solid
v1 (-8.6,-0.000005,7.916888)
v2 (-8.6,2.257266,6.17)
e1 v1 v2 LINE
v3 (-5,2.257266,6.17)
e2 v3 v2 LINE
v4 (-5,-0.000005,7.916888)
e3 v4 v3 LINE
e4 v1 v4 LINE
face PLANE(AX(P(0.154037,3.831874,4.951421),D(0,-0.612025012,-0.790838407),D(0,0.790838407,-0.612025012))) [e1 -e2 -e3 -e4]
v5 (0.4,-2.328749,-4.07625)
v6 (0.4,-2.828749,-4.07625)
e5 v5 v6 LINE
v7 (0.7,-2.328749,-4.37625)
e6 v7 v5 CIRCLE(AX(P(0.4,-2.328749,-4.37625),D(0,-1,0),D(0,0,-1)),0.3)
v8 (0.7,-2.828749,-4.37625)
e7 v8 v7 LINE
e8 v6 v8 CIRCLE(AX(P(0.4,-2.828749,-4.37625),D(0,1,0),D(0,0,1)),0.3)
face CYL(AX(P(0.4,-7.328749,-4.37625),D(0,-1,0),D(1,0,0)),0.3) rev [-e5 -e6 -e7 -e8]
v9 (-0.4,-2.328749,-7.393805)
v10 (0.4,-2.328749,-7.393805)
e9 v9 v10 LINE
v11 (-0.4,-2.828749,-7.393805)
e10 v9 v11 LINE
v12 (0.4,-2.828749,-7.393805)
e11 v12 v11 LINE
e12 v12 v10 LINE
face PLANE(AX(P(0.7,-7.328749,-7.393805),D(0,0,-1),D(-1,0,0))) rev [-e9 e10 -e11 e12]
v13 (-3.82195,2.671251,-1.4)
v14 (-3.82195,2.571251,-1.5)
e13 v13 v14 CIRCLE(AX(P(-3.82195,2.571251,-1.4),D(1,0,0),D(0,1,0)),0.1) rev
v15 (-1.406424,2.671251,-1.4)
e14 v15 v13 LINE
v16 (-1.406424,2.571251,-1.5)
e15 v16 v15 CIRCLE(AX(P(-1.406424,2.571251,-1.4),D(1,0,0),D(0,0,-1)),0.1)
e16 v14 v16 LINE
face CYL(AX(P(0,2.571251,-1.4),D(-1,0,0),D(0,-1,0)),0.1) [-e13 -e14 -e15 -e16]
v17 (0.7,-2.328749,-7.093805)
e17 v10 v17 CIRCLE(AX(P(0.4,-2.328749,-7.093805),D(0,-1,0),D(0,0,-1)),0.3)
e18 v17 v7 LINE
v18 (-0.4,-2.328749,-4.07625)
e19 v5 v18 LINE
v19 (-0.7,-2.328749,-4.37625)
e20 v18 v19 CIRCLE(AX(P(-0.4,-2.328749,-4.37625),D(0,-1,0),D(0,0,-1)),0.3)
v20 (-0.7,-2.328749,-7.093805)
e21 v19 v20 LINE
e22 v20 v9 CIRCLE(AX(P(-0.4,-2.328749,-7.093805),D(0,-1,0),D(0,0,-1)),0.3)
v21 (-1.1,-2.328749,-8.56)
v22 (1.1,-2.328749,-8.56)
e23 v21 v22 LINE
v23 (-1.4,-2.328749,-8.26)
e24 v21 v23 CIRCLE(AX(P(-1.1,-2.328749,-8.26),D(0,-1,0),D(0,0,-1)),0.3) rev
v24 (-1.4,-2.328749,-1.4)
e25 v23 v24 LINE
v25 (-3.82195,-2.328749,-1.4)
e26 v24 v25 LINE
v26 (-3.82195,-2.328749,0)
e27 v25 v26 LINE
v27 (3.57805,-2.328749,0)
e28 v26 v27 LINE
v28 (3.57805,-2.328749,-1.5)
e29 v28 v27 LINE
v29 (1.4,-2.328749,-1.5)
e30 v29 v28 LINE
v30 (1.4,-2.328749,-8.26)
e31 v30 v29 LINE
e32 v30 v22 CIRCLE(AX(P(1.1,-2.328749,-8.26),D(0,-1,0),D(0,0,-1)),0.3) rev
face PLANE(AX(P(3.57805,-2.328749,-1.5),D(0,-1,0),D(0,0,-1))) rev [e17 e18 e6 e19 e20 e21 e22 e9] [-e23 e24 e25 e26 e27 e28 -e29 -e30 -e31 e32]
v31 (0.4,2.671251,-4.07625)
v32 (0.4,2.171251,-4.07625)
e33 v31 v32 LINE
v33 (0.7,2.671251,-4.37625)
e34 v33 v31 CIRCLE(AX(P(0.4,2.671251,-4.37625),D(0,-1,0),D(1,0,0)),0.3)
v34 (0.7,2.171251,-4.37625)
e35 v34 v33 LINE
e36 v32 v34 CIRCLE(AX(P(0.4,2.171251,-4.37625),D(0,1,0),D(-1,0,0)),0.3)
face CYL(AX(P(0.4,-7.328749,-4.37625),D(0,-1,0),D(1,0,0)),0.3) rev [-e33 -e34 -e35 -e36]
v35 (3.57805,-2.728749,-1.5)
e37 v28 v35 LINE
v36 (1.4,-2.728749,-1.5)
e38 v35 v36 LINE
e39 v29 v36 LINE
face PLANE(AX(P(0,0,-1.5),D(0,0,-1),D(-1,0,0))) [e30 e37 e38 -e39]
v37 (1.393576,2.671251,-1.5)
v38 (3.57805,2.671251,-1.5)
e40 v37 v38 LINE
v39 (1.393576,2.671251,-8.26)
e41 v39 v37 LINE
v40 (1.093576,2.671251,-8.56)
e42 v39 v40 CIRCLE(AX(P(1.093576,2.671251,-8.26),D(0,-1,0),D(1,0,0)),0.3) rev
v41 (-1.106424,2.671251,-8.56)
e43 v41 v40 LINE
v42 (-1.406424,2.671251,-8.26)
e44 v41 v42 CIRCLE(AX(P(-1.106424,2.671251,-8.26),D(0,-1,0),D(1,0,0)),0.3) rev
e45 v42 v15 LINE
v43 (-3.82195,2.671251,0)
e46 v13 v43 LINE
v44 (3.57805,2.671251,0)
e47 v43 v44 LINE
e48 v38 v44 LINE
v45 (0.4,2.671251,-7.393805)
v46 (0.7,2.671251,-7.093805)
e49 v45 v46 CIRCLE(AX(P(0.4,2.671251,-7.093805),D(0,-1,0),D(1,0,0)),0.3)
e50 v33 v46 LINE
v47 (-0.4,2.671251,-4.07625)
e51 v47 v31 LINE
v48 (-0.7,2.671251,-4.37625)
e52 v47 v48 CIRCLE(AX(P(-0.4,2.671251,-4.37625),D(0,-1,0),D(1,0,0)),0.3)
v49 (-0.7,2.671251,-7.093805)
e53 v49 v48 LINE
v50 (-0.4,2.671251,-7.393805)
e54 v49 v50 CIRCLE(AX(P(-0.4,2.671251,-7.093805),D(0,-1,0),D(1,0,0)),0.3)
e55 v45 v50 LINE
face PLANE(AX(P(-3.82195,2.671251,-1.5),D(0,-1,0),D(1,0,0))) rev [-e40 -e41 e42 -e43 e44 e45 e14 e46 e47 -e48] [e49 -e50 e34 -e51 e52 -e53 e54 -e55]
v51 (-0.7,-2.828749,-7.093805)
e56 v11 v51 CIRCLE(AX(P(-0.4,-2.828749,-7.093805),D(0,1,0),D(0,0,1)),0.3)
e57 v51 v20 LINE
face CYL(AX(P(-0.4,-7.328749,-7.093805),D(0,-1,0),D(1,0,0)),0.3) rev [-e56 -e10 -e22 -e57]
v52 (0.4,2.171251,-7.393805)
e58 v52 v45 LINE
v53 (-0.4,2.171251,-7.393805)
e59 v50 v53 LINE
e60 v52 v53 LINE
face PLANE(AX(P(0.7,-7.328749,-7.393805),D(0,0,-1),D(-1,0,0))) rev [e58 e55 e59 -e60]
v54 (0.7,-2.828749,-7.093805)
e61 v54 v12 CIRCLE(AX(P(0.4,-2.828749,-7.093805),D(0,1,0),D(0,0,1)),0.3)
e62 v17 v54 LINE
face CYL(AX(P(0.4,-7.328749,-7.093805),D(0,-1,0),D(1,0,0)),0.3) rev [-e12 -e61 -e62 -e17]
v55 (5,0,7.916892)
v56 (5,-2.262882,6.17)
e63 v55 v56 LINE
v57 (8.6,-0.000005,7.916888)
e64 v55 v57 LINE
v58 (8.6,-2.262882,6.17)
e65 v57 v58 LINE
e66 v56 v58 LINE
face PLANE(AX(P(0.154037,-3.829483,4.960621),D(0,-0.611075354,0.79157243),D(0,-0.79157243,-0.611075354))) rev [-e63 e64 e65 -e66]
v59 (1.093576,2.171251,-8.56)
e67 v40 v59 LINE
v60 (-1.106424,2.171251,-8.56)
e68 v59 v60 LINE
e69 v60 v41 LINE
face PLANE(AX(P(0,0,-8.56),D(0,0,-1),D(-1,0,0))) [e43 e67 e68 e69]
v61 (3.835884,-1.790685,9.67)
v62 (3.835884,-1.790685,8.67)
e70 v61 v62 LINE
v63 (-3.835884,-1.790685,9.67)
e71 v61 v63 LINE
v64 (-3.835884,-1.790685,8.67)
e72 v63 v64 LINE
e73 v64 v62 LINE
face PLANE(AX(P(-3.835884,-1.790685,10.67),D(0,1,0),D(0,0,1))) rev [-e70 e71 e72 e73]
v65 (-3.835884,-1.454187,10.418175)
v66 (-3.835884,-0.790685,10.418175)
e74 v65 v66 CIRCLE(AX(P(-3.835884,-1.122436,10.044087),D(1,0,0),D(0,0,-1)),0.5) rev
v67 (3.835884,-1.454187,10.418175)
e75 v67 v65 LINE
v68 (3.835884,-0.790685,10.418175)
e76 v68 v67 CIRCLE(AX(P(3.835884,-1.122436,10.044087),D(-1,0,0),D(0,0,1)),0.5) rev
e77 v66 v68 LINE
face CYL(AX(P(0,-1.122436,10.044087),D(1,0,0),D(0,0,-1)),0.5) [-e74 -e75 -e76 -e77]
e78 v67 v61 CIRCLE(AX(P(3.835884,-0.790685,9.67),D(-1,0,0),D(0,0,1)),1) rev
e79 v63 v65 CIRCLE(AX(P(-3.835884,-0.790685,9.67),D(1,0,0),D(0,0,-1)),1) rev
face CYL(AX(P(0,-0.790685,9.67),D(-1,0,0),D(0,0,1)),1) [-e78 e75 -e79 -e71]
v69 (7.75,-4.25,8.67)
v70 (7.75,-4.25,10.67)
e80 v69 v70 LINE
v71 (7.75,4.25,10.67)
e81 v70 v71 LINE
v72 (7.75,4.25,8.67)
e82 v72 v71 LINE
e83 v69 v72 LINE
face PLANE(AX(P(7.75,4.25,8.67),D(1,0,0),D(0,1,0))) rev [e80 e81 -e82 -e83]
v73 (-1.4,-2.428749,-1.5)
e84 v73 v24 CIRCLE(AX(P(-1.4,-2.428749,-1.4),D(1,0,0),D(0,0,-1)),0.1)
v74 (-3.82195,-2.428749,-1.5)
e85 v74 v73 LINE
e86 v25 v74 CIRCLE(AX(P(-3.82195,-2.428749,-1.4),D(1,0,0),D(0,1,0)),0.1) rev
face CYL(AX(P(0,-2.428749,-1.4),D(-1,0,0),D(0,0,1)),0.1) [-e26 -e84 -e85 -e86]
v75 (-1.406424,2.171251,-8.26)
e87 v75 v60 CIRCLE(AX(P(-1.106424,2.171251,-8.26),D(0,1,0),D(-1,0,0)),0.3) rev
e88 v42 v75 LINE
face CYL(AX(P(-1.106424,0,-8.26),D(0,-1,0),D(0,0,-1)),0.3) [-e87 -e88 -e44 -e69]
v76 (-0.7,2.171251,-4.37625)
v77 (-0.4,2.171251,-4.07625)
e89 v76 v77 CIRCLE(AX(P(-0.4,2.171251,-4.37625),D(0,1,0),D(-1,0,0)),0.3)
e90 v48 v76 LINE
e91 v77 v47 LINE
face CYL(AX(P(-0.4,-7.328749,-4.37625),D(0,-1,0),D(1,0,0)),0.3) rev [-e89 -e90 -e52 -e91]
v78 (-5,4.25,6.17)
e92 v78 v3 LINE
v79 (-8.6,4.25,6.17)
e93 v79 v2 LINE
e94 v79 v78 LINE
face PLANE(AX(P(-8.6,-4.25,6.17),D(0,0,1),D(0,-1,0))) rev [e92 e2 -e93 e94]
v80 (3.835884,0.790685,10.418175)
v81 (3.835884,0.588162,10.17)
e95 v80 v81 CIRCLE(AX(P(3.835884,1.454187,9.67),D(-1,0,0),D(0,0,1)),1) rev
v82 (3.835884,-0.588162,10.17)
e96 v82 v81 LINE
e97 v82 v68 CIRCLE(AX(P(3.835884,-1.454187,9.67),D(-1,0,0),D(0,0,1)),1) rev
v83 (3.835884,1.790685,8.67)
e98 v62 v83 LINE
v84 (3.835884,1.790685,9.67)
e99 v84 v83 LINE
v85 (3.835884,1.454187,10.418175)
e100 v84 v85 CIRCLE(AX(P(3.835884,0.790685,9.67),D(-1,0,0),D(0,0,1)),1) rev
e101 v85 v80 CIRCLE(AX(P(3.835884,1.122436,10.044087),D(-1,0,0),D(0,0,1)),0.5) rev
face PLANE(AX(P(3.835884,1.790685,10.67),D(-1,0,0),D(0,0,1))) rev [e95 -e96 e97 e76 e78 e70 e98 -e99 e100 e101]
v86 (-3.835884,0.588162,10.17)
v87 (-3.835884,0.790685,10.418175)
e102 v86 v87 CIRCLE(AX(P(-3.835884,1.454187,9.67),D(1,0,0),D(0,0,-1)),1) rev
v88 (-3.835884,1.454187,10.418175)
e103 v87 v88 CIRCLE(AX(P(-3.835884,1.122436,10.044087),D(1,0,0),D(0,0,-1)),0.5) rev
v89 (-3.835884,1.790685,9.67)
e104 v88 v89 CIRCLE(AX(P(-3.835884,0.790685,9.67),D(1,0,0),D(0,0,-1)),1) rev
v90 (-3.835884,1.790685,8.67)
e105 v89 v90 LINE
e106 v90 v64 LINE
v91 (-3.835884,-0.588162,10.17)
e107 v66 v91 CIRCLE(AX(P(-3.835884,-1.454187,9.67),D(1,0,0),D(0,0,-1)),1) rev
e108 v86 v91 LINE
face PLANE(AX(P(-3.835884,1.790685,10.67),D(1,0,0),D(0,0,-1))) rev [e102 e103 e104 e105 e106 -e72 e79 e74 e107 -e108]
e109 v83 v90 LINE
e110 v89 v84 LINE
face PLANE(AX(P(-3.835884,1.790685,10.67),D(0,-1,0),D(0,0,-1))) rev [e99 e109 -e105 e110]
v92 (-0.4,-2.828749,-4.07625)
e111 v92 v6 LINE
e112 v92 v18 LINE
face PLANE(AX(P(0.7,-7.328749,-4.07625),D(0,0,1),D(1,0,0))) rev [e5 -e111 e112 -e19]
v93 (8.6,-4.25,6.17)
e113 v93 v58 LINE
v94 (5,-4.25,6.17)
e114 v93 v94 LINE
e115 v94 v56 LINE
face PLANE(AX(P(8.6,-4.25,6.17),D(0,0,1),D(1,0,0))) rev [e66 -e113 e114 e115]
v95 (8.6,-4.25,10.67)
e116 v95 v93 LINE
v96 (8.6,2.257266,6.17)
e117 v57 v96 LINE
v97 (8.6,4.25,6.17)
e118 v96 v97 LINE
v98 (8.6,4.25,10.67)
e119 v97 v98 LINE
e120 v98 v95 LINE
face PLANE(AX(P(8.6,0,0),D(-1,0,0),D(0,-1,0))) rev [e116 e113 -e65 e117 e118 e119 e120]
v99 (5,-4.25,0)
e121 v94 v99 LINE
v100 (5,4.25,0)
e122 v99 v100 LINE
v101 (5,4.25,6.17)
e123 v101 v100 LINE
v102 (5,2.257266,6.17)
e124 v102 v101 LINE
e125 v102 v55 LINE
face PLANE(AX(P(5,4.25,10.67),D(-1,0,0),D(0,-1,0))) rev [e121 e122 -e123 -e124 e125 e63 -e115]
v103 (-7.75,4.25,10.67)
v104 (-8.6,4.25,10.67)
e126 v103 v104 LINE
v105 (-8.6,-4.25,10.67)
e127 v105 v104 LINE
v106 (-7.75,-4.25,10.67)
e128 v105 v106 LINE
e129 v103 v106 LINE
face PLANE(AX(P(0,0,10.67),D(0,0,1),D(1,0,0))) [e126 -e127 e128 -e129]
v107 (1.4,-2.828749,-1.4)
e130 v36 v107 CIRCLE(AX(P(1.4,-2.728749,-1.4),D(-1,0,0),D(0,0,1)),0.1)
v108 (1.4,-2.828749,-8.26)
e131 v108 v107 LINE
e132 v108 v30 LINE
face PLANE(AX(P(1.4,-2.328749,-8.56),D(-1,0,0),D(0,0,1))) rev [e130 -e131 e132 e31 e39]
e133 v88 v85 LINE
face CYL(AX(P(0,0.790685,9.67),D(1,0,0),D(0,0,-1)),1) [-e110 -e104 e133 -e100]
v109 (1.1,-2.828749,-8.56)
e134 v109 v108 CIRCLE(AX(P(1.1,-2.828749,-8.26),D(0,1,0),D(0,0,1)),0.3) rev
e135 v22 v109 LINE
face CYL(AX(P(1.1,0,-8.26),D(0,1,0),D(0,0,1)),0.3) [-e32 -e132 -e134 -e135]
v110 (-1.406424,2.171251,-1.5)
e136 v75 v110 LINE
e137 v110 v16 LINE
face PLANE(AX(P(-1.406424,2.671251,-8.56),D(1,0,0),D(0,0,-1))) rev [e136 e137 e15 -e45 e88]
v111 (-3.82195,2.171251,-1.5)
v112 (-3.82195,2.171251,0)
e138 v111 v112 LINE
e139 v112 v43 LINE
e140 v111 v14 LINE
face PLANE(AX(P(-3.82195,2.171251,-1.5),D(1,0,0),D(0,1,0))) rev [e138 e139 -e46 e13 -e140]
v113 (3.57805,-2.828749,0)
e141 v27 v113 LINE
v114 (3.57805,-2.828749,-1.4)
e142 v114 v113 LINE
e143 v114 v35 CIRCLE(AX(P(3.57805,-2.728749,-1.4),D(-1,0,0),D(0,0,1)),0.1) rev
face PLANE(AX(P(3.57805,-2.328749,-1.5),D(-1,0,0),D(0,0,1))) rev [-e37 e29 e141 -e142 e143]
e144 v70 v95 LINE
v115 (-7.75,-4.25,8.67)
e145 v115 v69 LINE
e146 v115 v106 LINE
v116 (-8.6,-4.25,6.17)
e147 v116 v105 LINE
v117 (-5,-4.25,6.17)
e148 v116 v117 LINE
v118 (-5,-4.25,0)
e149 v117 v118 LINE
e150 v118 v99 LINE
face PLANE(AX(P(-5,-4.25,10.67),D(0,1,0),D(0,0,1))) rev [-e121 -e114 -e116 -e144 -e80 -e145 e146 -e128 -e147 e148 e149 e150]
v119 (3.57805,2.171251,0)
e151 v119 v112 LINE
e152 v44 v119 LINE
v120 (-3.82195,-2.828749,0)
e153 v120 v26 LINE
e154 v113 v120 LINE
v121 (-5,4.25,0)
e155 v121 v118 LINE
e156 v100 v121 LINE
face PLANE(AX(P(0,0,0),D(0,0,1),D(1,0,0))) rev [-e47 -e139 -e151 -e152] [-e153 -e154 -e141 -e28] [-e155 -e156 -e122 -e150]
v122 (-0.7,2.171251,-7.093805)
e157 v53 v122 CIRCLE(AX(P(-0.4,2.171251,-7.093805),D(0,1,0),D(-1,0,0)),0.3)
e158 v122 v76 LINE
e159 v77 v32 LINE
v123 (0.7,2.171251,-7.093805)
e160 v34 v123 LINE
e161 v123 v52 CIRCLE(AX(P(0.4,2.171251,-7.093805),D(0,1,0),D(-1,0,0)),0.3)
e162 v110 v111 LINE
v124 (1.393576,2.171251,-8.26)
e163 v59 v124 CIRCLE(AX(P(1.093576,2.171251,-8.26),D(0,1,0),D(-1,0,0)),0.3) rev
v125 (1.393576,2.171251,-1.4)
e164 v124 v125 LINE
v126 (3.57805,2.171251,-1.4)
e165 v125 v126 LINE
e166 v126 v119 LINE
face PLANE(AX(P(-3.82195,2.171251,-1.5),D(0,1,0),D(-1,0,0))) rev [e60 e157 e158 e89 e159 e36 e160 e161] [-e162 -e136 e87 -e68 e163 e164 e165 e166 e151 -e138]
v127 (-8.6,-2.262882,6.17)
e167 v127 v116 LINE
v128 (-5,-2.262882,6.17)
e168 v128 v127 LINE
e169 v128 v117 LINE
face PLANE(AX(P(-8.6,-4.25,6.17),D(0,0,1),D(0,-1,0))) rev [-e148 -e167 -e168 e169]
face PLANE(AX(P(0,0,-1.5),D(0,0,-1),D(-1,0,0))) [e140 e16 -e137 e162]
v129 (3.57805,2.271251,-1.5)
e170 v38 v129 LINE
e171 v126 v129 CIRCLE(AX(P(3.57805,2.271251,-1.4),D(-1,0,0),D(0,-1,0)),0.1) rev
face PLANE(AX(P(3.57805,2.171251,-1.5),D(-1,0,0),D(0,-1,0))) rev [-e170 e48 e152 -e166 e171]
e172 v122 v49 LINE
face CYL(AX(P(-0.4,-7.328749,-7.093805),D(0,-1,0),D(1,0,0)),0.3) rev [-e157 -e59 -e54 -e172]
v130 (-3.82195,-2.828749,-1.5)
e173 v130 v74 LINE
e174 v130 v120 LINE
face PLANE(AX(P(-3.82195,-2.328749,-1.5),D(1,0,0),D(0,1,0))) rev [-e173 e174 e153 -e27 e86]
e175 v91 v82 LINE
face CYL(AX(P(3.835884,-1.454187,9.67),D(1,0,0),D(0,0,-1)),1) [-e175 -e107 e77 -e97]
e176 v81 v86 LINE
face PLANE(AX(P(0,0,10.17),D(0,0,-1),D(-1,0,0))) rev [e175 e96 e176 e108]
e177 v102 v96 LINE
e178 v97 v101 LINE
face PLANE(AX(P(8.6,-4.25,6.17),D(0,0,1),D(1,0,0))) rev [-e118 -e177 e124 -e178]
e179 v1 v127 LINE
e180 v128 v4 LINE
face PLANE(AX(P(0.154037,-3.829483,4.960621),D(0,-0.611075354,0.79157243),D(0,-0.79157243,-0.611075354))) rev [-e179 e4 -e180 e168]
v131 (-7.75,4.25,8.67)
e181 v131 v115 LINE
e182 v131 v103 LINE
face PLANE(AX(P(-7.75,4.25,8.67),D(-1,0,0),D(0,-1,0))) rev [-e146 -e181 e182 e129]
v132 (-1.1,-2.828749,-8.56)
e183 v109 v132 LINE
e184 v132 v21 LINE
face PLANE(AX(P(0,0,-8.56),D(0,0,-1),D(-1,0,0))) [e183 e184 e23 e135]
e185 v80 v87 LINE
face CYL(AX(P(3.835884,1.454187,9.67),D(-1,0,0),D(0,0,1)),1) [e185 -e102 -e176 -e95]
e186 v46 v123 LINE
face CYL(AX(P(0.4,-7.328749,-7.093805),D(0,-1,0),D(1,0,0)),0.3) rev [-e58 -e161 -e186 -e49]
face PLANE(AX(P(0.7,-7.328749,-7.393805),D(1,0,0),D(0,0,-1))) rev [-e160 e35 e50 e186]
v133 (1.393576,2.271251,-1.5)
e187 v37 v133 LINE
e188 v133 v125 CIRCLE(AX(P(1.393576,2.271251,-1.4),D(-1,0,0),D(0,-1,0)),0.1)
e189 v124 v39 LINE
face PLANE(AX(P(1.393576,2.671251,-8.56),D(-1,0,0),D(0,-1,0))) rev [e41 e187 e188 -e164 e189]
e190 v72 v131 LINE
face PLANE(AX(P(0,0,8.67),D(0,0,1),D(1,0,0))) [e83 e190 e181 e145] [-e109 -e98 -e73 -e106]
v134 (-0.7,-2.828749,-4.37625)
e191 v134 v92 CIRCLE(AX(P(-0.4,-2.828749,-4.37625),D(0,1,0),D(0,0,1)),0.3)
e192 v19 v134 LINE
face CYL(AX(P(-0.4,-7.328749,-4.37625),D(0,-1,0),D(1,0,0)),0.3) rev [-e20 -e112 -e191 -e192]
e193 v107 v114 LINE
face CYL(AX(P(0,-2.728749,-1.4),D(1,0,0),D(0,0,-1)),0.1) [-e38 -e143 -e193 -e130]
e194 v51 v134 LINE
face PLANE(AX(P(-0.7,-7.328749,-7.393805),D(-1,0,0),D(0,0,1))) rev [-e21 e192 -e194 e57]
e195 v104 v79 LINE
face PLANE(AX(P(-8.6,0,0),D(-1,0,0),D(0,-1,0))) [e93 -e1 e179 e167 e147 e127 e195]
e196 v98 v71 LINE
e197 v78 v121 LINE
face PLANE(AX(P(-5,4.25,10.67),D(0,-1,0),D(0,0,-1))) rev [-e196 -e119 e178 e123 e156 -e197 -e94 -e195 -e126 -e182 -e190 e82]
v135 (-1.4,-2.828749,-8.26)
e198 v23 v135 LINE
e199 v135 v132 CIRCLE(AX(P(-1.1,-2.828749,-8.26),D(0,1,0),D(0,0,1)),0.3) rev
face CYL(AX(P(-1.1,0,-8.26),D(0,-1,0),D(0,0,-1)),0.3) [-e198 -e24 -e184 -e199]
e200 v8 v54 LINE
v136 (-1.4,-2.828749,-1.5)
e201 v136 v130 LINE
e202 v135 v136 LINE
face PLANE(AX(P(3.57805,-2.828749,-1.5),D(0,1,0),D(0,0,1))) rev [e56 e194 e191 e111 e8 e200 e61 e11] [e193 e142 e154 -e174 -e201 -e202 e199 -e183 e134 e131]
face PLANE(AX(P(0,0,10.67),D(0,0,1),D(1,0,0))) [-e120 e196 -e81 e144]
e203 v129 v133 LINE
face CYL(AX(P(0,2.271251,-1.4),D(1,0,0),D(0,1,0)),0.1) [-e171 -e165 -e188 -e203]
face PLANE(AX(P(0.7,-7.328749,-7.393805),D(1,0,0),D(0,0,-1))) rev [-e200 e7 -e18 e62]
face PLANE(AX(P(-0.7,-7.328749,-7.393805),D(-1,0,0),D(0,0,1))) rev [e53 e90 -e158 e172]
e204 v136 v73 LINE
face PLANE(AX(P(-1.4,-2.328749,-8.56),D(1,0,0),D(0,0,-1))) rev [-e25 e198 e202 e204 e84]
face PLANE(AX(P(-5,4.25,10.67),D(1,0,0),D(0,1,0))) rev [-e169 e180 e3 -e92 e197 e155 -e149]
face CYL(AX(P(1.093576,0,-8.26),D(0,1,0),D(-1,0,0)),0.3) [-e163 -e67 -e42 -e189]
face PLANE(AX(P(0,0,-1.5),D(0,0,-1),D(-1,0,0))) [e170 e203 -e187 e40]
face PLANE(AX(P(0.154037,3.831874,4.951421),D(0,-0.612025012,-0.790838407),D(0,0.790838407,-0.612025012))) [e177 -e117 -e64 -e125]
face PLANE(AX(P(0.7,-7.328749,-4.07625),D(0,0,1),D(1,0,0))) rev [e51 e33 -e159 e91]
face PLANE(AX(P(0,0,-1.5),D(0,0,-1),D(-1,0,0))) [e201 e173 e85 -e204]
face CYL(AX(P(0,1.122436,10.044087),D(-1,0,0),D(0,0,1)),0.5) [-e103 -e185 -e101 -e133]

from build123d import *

# Parameters (mm, degrees)
SKETCH1_W           = 10
SKETCH1_H           = 8.5
BOSS_EXTRUDE1_DEPTH = 10.67
SKETCH2_W           = 7.4
SKETCH2_H           = 0.5
BOSS_EXTRUDE2_DEPTH = 1.5
SKETCH3_W           = 2.8
SKETCH3_H           = 0.5
BOSS_EXTRUDE3_DEPTH = 7.06
FILLET4_R           = 0.1
SKETCH5_W           = 4.5
SKETCH5_H           = 8.5
BOSS_EXTRUDE4_DEPTH = 3.6
SKETCH6_W           = 4.5
SKETCH6_H           = 8.5
BOSS_EXTRUDE5_DEPTH = 3.6
CUT_EXTRUDE2_START  = -17.2
CUT_EXTRUDE2_DEPTH  = 17.2
BOSS_EXTRUDE6_DEPTH = 10
SKETCH9_W           = 15.5
SKETCH9_H           = 8.5
CUT_EXTRUDE3_DEPTH  = 2
SKETCH10_W          = 7.671768302
SKETCH10_H          = 3.58137051
BOSS_EXTRUDE7_DEPTH = 2
SKETCH12_W          = 7.671768302
SKETCH12_H          = 1.176323548
CUT_EXTRUDE4_DEPTH  = 0.5
FILLET7_R           = 1
FILLET8_R           = 0.5
SKETCH13_W          = 1.4
SKETCH13_H          = 3.317554906
CUT_EXTRUDE5_DEPTH  = 10
FILLET9_R           = 0.3


with BuildPart() as part:
    # Sketch1 → Boss-Extrude1 (new body)
    with BuildSketch(Plane.XY):
        Rectangle(SKETCH1_W, SKETCH1_H)
    extrude(amount=BOSS_EXTRUDE1_DEPTH)

    # Sketch2 → Boss-Extrude2 (add)
    with BuildSketch(Plane(origin=(0, 0, 0), x_dir=(-1, 0, 0), z_dir=(0, 0, -1))):
        with Locations((0.121950207, -2.578749491)):
            Rectangle(SKETCH2_W, SKETCH2_H)
        with Locations((0.121950207, 2.421250509)):
            Rectangle(SKETCH2_W, SKETCH2_H)
    extrude(amount=BOSS_EXTRUDE2_DEPTH)

    # Sketch3 → Boss-Extrude3 (add)
    with BuildSketch(Plane(origin=(0, 0, -1.5), x_dir=(-1, 0, 0), z_dir=(0, 0, -1))):
        with Locations((0, -2.578749491)):
            Rectangle(SKETCH3_W, SKETCH3_H)
        with Locations((0.006424345, 2.421250509)):
            Rectangle(SKETCH3_W, SKETCH3_H)
    extrude(amount=BOSS_EXTRUDE3_DEPTH)

    # Fillet4
    fillet4_edges = [part.edges().sort_by_distance(p)[0] for p in [
        (2.489024896, -2.828749491, -1.5),
        (-2.610975104, -2.328749491, -1.5),
        (-2.614187276, 2.671250509, -1.5),
        (2.485812724, 2.171250509, -1.5),
    ]]
    fillet(fillet4_edges, radius=FILLET4_R)

    # Sketch5 → Boss-Extrude4 (add)
    with BuildSketch(Plane(origin=(5, 0, 0), x_dir=(0, 0, -1), z_dir=(1, 0, 0))):
        with Locations((-8.42, 0)):
            Rectangle(SKETCH5_W, SKETCH5_H)
    extrude(amount=BOSS_EXTRUDE4_DEPTH)

    # Sketch6 → Boss-Extrude5 (add)
    with BuildSketch(Plane.ZY.offset(5)):
        with Locations((8.42, 0)):
            Rectangle(SKETCH6_W, SKETCH6_H)
    extrude(amount=BOSS_EXTRUDE5_DEPTH)

    # Sketch7 → Cut-Extrude2 (cut)
    with BuildSketch(Plane(origin=(8.6, 0, 0), x_dir=(0, 0, -1), z_dir=(1, 0, 0)).offset(CUT_EXTRUDE2_START)):
        Polygon((-6.17, 2.257266115), (-7.916888321, -4.993e-06), (-6.17, -2.262882433), align=None)
    cut_extrude2 = extrude(amount=CUT_EXTRUDE2_DEPTH, mode=Mode.SUBTRACT)

    # Mirror2: Cut-Extrude2 across plane
    add(cut_extrude2.mirror(Plane(origin=(0, 0, 0), x_dir=(0, 0, 1), z_dir=(1, 0, 0))), mode=Mode.SUBTRACT)

    # Sketch8 → Boss-Extrude6 (add)
    with BuildSketch(Plane(origin=(5, 0, 0), x_dir=(0, 0, -1), z_dir=(1, 0, 0))):
        Polygon((-6.17, -2.262882433), (-7.916892176, 0), (-6.17, 2.257266115), align=None)
    extrude(amount=-BOSS_EXTRUDE6_DEPTH)

    # Sketch9 → Cut-Extrude3 (cut)
    with BuildSketch(Plane.XY.offset(10.67)):
        Rectangle(SKETCH9_W, SKETCH9_H)
    extrude(amount=-CUT_EXTRUDE3_DEPTH, mode=Mode.SUBTRACT)

    # Sketch10 → Boss-Extrude7 (add)
    with BuildSketch(Plane.XY.offset(8.67)):
        Rectangle(SKETCH10_W, SKETCH10_H)
    extrude(amount=BOSS_EXTRUDE7_DEPTH)

    # Sketch12 → Cut-Extrude4 (cut)
    with BuildSketch(Plane.XY.offset(10.67)):
        Rectangle(SKETCH12_W, SKETCH12_H)
    extrude(amount=-CUT_EXTRUDE4_DEPTH, mode=Mode.SUBTRACT)

    # Fillet7
    # the kernel refuses this fillet: 1 mm, written as the material it takes off along each edge
    with BuildSketch(Plane(origin=(6.00094766, 0.588161774, 10.67), x_dir=(0, 1, 0), z_dir=(-1, 0, 0))) as fillet7_piece_1:
        with BuildLine():
            CenterArc((0.866025404, 1), FILLET7_R, 210, 60)
            Line((0, 0.5), (-0.017320508, 0.49))
            ThreePointArc((-0.017320508, 0.49), (-0.02, 0.25), (-0.02, 0))
            Line((-0.02, 0), (0, -0.02))
            Line((0, -0.02), (0.866025404, -0.02))
            Line((0.866025404, -0.02), (0.866025404, 0))
        make_face()
    extrude(amount=12.001895321, mode=Mode.SUBTRACT)
    with BuildSketch(Plane(origin=(-6.00094766, -0.588161774, 10.67), x_dir=(0, 0, -1), z_dir=(1, 0, 0))) as fillet7_piece_2:
        with BuildLine():
            CenterArc((1, -0.866025404), FILLET7_R, 120, 60)
            Line((0, -0.866025404), (-0.02, -0.866025404))
            Line((-0.02, -0.866025404), (-0.02, 0))
            Line((-0.02, 0), (0, 0.02))
            ThreePointArc((0, 0.02), (0.25, 0.02), (0.49, 0.017320508))
            Line((0.49, 0.017320508), (0.5, 0))
        make_face()
    extrude(amount=12.001895321, mode=Mode.SUBTRACT)
    with BuildSketch(Plane(origin=(6.335884151, -1.790685255, 10.67), x_dir=(0, 0, -1), z_dir=(-1, 0, 0)), Plane(origin=(-6.335884151, 1.790685255, 10.67), x_dir=(0, 0, -1), z_dir=(1, 0, 0))) as fillet7_piece_3:
        with BuildLine():
            CenterArc((FILLET7_R, -FILLET7_R), FILLET7_R, 90, 90)
            Line((0, -FILLET7_R), (-FILLET7_R * 0.02, -FILLET7_R))
            Line((-FILLET7_R * 0.02, -FILLET7_R), (-FILLET7_R * 0.02, FILLET7_R * 0.02))
            Line((-FILLET7_R * 0.02, FILLET7_R * 0.02), (FILLET7_R, FILLET7_R * 0.02))
            Line((FILLET7_R, FILLET7_R * 0.02), (FILLET7_R, 0))
        make_face()
    extrude(amount=12.671768302, mode=Mode.SUBTRACT)

    # Fillet8
    fillet8_edges = [part.edges().sort_by_distance(p)[0] for p in [
        (0, 1.122436216, 10.613367002),
        (0, -1.122436216, 10.613367002),
    ]]
    fillet(fillet8_edges, radius=FILLET8_R)

    # Sketch13 → Cut-Extrude5 (cut)
    with BuildSketch(Plane(origin=(0, 2.671250509, 0), x_dir=(1, 0, 0), z_dir=(0, 1, 0))):
        with Locations((0, 5.735027383)):
            Rectangle(SKETCH13_W, SKETCH13_H)
    extrude(amount=-CUT_EXTRUDE5_DEPTH, mode=Mode.SUBTRACT)

    # Fillet9
    fillet9_edges = [part.edges().sort_by_distance(p)[0] for p in [
        (0.7, -2.578749491, -7.393804836),
        (0.7, 2.421250509, -7.393804836),
        (0.7, -2.578749491, -4.07624993),
        (0.7, 2.421250509, -4.07624993),
        (-0.7, -2.578749491, -4.07624993),
        (-0.7, 2.421250509, -4.07624993),
        (-0.7, -2.578749491, -7.393804836),
        (-0.7, 2.421250509, -7.393804836),
        (1.4, -2.578749491, -8.56),
        (-1.4, -2.578749491, -8.56),
        (1.393575655, 2.421250509, -8.56),
        (-1.406424345, 2.421250509, -8.56),
    ]]
    fillet(fillet9_edges, radius=FILLET9_R)


solid = part.part
